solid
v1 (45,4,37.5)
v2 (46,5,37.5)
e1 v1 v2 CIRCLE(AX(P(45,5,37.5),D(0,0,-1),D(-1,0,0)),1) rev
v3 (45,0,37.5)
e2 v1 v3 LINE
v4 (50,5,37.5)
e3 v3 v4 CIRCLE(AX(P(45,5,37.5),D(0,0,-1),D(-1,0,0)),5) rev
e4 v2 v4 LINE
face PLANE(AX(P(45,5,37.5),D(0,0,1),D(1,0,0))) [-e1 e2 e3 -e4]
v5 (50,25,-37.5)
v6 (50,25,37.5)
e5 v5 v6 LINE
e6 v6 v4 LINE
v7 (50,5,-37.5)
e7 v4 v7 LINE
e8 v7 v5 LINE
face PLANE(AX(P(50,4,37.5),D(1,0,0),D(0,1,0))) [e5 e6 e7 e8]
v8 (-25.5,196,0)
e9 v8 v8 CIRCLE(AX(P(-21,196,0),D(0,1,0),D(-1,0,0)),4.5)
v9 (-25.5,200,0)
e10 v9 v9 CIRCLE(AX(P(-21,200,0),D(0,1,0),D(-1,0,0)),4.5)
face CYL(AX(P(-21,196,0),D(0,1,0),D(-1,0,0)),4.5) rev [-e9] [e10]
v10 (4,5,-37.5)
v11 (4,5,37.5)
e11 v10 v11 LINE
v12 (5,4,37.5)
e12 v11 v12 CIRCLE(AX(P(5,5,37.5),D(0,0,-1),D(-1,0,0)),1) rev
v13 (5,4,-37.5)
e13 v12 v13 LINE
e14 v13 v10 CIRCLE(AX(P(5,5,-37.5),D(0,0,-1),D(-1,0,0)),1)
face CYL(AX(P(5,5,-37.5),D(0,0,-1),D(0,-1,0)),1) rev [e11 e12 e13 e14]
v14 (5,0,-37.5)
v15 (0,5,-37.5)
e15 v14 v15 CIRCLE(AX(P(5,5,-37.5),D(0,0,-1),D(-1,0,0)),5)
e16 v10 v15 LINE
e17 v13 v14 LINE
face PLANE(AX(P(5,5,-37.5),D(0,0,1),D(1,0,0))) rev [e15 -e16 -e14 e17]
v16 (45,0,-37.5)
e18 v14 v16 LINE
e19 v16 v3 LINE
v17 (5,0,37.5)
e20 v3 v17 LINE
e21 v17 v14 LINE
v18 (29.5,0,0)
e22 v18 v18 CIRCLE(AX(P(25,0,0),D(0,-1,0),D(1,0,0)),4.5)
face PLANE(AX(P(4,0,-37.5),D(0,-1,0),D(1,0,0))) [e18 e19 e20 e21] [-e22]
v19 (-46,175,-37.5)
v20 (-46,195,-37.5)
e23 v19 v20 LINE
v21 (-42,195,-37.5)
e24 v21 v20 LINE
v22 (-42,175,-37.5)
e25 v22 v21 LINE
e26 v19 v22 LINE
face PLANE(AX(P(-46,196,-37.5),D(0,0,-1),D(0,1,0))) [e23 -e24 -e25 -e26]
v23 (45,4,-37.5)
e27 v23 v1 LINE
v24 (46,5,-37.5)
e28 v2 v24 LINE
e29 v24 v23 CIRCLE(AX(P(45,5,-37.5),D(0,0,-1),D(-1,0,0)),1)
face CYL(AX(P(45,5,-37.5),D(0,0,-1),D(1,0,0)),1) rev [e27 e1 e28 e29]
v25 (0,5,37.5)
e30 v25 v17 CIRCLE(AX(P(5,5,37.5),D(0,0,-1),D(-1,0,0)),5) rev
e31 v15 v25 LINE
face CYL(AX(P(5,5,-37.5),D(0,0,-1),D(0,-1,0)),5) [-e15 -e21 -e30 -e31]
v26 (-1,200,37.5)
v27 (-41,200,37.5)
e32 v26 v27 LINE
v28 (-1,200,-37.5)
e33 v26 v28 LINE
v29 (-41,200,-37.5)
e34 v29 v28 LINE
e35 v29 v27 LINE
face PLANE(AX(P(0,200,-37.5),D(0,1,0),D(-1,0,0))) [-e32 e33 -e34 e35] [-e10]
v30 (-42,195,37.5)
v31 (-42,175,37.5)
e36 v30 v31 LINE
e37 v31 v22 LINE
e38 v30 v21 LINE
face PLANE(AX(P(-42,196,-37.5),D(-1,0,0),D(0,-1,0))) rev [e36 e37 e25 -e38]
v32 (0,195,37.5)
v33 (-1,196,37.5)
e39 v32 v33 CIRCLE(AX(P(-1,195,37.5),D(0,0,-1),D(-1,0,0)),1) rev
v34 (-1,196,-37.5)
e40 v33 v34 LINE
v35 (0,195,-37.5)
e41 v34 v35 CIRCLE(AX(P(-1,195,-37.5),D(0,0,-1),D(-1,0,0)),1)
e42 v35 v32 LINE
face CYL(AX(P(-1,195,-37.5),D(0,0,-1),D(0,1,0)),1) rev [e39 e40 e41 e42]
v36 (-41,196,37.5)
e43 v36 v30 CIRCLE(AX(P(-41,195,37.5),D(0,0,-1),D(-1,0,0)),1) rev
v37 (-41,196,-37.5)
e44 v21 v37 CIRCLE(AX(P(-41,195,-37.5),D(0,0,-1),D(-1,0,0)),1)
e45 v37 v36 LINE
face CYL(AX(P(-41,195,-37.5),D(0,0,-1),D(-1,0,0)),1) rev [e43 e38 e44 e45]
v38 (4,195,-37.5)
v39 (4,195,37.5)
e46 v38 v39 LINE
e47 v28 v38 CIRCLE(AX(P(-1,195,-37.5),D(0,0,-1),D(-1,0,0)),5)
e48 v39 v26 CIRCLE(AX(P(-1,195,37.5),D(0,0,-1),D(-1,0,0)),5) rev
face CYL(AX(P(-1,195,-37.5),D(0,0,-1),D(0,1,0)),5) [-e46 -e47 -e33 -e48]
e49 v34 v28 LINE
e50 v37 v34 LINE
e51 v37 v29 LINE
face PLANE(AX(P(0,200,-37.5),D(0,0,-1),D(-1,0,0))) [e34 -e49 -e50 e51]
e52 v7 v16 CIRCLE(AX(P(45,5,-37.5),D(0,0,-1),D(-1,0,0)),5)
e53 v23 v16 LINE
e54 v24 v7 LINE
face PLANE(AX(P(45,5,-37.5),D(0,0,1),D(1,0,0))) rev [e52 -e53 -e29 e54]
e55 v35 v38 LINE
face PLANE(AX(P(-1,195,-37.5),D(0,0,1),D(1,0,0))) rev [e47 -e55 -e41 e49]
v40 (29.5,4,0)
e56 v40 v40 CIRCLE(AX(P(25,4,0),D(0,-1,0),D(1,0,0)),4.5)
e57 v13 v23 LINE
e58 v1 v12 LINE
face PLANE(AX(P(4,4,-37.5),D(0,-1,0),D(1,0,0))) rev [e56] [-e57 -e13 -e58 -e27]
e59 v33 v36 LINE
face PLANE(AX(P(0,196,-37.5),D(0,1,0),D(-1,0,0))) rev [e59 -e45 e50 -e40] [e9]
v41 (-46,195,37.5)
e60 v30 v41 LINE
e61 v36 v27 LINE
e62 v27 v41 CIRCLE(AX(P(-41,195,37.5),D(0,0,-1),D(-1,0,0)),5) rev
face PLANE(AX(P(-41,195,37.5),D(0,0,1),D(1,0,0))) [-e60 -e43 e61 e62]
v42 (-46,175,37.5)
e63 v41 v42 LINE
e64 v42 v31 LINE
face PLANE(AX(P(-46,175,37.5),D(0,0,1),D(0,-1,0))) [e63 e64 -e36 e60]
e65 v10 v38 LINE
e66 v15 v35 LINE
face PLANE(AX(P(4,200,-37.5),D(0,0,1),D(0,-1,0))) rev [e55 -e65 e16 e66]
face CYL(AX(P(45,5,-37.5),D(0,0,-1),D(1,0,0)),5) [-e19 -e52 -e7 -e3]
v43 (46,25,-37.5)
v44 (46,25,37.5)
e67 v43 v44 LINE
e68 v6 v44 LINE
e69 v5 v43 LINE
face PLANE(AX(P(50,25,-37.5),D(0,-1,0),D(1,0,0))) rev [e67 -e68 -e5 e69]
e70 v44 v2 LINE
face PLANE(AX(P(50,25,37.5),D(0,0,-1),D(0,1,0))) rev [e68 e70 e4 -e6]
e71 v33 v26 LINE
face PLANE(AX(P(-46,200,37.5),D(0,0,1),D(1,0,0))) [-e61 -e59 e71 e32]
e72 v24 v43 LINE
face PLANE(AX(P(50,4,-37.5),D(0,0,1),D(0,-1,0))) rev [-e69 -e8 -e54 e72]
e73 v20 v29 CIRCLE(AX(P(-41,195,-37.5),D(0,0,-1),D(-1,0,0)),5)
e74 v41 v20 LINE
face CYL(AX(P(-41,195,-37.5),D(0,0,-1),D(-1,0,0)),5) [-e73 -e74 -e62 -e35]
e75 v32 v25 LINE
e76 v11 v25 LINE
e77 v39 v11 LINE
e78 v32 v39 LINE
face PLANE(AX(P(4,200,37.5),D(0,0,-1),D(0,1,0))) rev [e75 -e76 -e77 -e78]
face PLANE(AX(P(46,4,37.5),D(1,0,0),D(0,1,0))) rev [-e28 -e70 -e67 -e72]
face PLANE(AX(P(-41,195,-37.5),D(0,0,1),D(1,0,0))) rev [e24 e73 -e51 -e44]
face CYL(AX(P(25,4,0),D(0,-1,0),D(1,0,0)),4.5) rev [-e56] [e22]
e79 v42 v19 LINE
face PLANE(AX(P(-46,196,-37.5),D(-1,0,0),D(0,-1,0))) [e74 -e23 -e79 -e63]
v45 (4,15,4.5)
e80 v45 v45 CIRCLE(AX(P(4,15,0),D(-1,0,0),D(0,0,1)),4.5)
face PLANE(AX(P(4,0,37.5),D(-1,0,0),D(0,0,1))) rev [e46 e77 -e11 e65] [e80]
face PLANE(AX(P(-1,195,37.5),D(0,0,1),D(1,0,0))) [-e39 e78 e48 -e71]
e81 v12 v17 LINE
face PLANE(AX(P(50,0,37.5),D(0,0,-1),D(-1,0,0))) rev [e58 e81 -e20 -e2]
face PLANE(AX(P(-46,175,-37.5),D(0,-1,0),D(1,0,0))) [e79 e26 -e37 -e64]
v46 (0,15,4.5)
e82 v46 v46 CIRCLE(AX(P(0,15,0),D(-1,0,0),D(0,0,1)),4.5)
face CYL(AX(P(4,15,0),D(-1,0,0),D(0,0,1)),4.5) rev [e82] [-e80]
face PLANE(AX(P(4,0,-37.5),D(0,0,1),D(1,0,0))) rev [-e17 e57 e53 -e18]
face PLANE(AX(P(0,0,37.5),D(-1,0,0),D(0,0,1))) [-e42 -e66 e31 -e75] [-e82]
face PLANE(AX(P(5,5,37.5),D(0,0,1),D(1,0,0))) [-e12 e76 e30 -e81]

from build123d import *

# Parameters (mm, degrees)
BASEFLANGE_W                   = 75
BASEFLANGE_H                   = 200
BASE_FLANGE1_DEPTH             = 4
EDGE_FLANGE1_STRIP_W           = 18
EDGE_FLANGE1_STRIP_H           = 4
EDGE_FLANGE1_STRIP_CUT_DEPTH   = 75
EDGE_FLANGE1_STRIP_2_W         = 18
EDGE_FLANGE1_STRIP_2_H         = 4
EDGE_FLANGE1_STRIP_CUT_2_DEPTH = 75
EDGE_FLANGE1_DEPTH             = 75
EDGE_FLANGE1_BEND_DEPTH        = 75
EDGE_FLANGE2_STRIP_W           = 18
EDGE_FLANGE2_STRIP_H           = 4
EDGE_FLANGE2_STRIP_CUT_DEPTH   = 75
EDGE_FLANGE2_STRIP_2_W         = 18
EDGE_FLANGE2_STRIP_2_H         = 4
EDGE_FLANGE2_STRIP_CUT_2_DEPTH = 75
EDGE_FLANGE2_DEPTH             = 75
EDGE_FLANGE2_BEND_DEPTH        = 75
SKETCH15_R                     = 4.5
EXTRUDE1_DEPTH                 = 4
SKETCH16_R                     = 4.5
EXTRUDE2_DEPTH                 = 4
SKETCH17_R                     = 4.5
CUT_EXTRUDE1_DEPTH             = 4


# Sheet-metal steps are written as plain solids
with BuildPart() as part:
    # BaseFlange → Base-Flange1 (new body)
    with BuildSketch(Plane(origin=(0, 0, 0), x_dir=(0, 0, -1), z_dir=(1, 0, 0))):
        with Locations((0, 100)):
            Rectangle(BASEFLANGE_W, BASEFLANGE_H)
    extrude(amount=BASE_FLANGE1_DEPTH)

    # Edge-Flange1 strip (across the edge) → Edge-Flange1 strip cut (cut)
    with BuildSketch(Plane(origin=(0, 200, 37.5), x_dir=(0, -1, 0), z_dir=(0, 0, -1))):
        with Locations((-4, -2)):
            Rectangle(EDGE_FLANGE1_STRIP_W, EDGE_FLANGE1_STRIP_H)
    extrude(amount=EDGE_FLANGE1_STRIP_CUT_DEPTH, mode=Mode.SUBTRACT)

    # Edge-Flange1 strip 2 (across the edge) → Edge-Flange1 strip cut 2 (cut)
    with BuildSketch(Plane(origin=(4, 0, 37.5), x_dir=(0, 1, 0), z_dir=(0, 0, -1))):
        with Locations((-4, -2)):
            Rectangle(EDGE_FLANGE1_STRIP_2_W, EDGE_FLANGE1_STRIP_2_H)
    extrude(amount=EDGE_FLANGE1_STRIP_CUT_2_DEPTH, mode=Mode.SUBTRACT)

    # Edge-Flange1 section (across the edge) → Edge-Flange1 (add)
    with BuildSketch(Plane(origin=(0, 200, 37.5), x_dir=(0, -1, 0), z_dir=(0, 0, -1))):
        with BuildLine():
            Line((0, 1), (0, 46))
            Line((0, 46), (4, 46))
            Line((4, 46), (4, 1))
            ThreePointArc((4, 1), (4.292893219, 0.292893219), (5, 0))
            Line((5, 0), (5, -4))
            ThreePointArc((5, -4), (1.464466094, -2.535533906), (0, 1))
        make_face()
    extrude(amount=EDGE_FLANGE1_DEPTH)

    # Edge-Flange1 section 2 (across the edge) → Edge-Flange1 bend (add)
    with BuildSketch(Plane(origin=(4, 0, 37.5), x_dir=(0, 1, 0), z_dir=(0, 0, -1))):
        with BuildLine():
            Line((0, 1), (0, 46))
            Line((0, 46), (4, 46))
            Line((4, 46), (4, 1))
            ThreePointArc((4, 1), (4.292893219, 0.292893219), (5, 0))
            Line((5, 0), (5, -4))
            ThreePointArc((5, -4), (1.464466094, -2.535533906), (0, 1))
        make_face()
    extrude(amount=EDGE_FLANGE1_BEND_DEPTH)

    # Edge-Flange2 strip (across the edge) → Edge-Flange2 strip cut (cut)
    with BuildSketch(Plane(origin=(-46, 196, 37.5), x_dir=(1, 0, 0), z_dir=(0, 0, -1))):
        with Locations((-4, -2)):
            Rectangle(EDGE_FLANGE2_STRIP_W, EDGE_FLANGE2_STRIP_H)
    extrude(amount=EDGE_FLANGE2_STRIP_CUT_DEPTH, mode=Mode.SUBTRACT)

    # Edge-Flange2 strip 2 (across the edge) → Edge-Flange2 strip cut 2 (cut)
    with BuildSketch(Plane(origin=(50, 4, 37.5), x_dir=(-1, 0, 0), z_dir=(0, 0, -1))):
        with Locations((-4, -2)):
            Rectangle(EDGE_FLANGE2_STRIP_2_W, EDGE_FLANGE2_STRIP_2_H)
    extrude(amount=EDGE_FLANGE2_STRIP_CUT_2_DEPTH, mode=Mode.SUBTRACT)

    # Edge-Flange2 section (across the edge) → Edge-Flange2 (add)
    with BuildSketch(Plane(origin=(-46, 196, 37.5), x_dir=(1, 0, 0), z_dir=(0, 0, -1))):
        with BuildLine():
            Line((0, 1), (0, 21))
            Line((0, 21), (4, 21))
            Line((4, 21), (4, 1))
            ThreePointArc((4, 1), (4.292893219, 0.292893219), (5, 0))
            Line((5, 0), (5, -4))
            ThreePointArc((5, -4), (1.464466094, -2.535533906), (0, 1))
        make_face()
    extrude(amount=EDGE_FLANGE2_DEPTH)

    # Edge-Flange2 section 2 (across the edge) → Edge-Flange2 bend (add)
    with BuildSketch(Plane(origin=(50, 4, 37.5), x_dir=(-1, 0, 0), z_dir=(0, 0, -1))):
        with BuildLine():
            Line((0, 1), (0, 21))
            Line((0, 21), (4, 21))
            Line((4, 21), (4, 1))
            ThreePointArc((4, 1), (4.292893219, 0.292893219), (5, 0))
            Line((5, 0), (5, -4))
            ThreePointArc((5, -4), (1.464466094, -2.535533906), (0, 1))
        make_face()
    extrude(amount=EDGE_FLANGE2_BEND_DEPTH)

    # Sketch15 → Extrude1 (cut)
    with BuildSketch(Plane(origin=(0, 200, 0), x_dir=(1, 0, 0), z_dir=(0, 1, 0))):
        with Locations(Location((-21, 0, 0), (0, 0, 180))):
            Circle(SKETCH15_R)
    extrude(amount=-EXTRUDE1_DEPTH, mode=Mode.SUBTRACT)

    # Sketch16 → Extrude2 (cut)
    with BuildSketch(Plane.XZ):
        with Locations((25, 0)):
            Circle(SKETCH16_R)
    extrude(amount=-EXTRUDE2_DEPTH, mode=Mode.SUBTRACT)

    # Sketch17 → Cut-Extrude1 (cut)
    with BuildSketch(Plane.ZY):
        with Locations((0, 15)):
            Circle(SKETCH17_R)
    extrude(amount=-CUT_EXTRUDE1_DEPTH, mode=Mode.SUBTRACT)


solid = part.part
